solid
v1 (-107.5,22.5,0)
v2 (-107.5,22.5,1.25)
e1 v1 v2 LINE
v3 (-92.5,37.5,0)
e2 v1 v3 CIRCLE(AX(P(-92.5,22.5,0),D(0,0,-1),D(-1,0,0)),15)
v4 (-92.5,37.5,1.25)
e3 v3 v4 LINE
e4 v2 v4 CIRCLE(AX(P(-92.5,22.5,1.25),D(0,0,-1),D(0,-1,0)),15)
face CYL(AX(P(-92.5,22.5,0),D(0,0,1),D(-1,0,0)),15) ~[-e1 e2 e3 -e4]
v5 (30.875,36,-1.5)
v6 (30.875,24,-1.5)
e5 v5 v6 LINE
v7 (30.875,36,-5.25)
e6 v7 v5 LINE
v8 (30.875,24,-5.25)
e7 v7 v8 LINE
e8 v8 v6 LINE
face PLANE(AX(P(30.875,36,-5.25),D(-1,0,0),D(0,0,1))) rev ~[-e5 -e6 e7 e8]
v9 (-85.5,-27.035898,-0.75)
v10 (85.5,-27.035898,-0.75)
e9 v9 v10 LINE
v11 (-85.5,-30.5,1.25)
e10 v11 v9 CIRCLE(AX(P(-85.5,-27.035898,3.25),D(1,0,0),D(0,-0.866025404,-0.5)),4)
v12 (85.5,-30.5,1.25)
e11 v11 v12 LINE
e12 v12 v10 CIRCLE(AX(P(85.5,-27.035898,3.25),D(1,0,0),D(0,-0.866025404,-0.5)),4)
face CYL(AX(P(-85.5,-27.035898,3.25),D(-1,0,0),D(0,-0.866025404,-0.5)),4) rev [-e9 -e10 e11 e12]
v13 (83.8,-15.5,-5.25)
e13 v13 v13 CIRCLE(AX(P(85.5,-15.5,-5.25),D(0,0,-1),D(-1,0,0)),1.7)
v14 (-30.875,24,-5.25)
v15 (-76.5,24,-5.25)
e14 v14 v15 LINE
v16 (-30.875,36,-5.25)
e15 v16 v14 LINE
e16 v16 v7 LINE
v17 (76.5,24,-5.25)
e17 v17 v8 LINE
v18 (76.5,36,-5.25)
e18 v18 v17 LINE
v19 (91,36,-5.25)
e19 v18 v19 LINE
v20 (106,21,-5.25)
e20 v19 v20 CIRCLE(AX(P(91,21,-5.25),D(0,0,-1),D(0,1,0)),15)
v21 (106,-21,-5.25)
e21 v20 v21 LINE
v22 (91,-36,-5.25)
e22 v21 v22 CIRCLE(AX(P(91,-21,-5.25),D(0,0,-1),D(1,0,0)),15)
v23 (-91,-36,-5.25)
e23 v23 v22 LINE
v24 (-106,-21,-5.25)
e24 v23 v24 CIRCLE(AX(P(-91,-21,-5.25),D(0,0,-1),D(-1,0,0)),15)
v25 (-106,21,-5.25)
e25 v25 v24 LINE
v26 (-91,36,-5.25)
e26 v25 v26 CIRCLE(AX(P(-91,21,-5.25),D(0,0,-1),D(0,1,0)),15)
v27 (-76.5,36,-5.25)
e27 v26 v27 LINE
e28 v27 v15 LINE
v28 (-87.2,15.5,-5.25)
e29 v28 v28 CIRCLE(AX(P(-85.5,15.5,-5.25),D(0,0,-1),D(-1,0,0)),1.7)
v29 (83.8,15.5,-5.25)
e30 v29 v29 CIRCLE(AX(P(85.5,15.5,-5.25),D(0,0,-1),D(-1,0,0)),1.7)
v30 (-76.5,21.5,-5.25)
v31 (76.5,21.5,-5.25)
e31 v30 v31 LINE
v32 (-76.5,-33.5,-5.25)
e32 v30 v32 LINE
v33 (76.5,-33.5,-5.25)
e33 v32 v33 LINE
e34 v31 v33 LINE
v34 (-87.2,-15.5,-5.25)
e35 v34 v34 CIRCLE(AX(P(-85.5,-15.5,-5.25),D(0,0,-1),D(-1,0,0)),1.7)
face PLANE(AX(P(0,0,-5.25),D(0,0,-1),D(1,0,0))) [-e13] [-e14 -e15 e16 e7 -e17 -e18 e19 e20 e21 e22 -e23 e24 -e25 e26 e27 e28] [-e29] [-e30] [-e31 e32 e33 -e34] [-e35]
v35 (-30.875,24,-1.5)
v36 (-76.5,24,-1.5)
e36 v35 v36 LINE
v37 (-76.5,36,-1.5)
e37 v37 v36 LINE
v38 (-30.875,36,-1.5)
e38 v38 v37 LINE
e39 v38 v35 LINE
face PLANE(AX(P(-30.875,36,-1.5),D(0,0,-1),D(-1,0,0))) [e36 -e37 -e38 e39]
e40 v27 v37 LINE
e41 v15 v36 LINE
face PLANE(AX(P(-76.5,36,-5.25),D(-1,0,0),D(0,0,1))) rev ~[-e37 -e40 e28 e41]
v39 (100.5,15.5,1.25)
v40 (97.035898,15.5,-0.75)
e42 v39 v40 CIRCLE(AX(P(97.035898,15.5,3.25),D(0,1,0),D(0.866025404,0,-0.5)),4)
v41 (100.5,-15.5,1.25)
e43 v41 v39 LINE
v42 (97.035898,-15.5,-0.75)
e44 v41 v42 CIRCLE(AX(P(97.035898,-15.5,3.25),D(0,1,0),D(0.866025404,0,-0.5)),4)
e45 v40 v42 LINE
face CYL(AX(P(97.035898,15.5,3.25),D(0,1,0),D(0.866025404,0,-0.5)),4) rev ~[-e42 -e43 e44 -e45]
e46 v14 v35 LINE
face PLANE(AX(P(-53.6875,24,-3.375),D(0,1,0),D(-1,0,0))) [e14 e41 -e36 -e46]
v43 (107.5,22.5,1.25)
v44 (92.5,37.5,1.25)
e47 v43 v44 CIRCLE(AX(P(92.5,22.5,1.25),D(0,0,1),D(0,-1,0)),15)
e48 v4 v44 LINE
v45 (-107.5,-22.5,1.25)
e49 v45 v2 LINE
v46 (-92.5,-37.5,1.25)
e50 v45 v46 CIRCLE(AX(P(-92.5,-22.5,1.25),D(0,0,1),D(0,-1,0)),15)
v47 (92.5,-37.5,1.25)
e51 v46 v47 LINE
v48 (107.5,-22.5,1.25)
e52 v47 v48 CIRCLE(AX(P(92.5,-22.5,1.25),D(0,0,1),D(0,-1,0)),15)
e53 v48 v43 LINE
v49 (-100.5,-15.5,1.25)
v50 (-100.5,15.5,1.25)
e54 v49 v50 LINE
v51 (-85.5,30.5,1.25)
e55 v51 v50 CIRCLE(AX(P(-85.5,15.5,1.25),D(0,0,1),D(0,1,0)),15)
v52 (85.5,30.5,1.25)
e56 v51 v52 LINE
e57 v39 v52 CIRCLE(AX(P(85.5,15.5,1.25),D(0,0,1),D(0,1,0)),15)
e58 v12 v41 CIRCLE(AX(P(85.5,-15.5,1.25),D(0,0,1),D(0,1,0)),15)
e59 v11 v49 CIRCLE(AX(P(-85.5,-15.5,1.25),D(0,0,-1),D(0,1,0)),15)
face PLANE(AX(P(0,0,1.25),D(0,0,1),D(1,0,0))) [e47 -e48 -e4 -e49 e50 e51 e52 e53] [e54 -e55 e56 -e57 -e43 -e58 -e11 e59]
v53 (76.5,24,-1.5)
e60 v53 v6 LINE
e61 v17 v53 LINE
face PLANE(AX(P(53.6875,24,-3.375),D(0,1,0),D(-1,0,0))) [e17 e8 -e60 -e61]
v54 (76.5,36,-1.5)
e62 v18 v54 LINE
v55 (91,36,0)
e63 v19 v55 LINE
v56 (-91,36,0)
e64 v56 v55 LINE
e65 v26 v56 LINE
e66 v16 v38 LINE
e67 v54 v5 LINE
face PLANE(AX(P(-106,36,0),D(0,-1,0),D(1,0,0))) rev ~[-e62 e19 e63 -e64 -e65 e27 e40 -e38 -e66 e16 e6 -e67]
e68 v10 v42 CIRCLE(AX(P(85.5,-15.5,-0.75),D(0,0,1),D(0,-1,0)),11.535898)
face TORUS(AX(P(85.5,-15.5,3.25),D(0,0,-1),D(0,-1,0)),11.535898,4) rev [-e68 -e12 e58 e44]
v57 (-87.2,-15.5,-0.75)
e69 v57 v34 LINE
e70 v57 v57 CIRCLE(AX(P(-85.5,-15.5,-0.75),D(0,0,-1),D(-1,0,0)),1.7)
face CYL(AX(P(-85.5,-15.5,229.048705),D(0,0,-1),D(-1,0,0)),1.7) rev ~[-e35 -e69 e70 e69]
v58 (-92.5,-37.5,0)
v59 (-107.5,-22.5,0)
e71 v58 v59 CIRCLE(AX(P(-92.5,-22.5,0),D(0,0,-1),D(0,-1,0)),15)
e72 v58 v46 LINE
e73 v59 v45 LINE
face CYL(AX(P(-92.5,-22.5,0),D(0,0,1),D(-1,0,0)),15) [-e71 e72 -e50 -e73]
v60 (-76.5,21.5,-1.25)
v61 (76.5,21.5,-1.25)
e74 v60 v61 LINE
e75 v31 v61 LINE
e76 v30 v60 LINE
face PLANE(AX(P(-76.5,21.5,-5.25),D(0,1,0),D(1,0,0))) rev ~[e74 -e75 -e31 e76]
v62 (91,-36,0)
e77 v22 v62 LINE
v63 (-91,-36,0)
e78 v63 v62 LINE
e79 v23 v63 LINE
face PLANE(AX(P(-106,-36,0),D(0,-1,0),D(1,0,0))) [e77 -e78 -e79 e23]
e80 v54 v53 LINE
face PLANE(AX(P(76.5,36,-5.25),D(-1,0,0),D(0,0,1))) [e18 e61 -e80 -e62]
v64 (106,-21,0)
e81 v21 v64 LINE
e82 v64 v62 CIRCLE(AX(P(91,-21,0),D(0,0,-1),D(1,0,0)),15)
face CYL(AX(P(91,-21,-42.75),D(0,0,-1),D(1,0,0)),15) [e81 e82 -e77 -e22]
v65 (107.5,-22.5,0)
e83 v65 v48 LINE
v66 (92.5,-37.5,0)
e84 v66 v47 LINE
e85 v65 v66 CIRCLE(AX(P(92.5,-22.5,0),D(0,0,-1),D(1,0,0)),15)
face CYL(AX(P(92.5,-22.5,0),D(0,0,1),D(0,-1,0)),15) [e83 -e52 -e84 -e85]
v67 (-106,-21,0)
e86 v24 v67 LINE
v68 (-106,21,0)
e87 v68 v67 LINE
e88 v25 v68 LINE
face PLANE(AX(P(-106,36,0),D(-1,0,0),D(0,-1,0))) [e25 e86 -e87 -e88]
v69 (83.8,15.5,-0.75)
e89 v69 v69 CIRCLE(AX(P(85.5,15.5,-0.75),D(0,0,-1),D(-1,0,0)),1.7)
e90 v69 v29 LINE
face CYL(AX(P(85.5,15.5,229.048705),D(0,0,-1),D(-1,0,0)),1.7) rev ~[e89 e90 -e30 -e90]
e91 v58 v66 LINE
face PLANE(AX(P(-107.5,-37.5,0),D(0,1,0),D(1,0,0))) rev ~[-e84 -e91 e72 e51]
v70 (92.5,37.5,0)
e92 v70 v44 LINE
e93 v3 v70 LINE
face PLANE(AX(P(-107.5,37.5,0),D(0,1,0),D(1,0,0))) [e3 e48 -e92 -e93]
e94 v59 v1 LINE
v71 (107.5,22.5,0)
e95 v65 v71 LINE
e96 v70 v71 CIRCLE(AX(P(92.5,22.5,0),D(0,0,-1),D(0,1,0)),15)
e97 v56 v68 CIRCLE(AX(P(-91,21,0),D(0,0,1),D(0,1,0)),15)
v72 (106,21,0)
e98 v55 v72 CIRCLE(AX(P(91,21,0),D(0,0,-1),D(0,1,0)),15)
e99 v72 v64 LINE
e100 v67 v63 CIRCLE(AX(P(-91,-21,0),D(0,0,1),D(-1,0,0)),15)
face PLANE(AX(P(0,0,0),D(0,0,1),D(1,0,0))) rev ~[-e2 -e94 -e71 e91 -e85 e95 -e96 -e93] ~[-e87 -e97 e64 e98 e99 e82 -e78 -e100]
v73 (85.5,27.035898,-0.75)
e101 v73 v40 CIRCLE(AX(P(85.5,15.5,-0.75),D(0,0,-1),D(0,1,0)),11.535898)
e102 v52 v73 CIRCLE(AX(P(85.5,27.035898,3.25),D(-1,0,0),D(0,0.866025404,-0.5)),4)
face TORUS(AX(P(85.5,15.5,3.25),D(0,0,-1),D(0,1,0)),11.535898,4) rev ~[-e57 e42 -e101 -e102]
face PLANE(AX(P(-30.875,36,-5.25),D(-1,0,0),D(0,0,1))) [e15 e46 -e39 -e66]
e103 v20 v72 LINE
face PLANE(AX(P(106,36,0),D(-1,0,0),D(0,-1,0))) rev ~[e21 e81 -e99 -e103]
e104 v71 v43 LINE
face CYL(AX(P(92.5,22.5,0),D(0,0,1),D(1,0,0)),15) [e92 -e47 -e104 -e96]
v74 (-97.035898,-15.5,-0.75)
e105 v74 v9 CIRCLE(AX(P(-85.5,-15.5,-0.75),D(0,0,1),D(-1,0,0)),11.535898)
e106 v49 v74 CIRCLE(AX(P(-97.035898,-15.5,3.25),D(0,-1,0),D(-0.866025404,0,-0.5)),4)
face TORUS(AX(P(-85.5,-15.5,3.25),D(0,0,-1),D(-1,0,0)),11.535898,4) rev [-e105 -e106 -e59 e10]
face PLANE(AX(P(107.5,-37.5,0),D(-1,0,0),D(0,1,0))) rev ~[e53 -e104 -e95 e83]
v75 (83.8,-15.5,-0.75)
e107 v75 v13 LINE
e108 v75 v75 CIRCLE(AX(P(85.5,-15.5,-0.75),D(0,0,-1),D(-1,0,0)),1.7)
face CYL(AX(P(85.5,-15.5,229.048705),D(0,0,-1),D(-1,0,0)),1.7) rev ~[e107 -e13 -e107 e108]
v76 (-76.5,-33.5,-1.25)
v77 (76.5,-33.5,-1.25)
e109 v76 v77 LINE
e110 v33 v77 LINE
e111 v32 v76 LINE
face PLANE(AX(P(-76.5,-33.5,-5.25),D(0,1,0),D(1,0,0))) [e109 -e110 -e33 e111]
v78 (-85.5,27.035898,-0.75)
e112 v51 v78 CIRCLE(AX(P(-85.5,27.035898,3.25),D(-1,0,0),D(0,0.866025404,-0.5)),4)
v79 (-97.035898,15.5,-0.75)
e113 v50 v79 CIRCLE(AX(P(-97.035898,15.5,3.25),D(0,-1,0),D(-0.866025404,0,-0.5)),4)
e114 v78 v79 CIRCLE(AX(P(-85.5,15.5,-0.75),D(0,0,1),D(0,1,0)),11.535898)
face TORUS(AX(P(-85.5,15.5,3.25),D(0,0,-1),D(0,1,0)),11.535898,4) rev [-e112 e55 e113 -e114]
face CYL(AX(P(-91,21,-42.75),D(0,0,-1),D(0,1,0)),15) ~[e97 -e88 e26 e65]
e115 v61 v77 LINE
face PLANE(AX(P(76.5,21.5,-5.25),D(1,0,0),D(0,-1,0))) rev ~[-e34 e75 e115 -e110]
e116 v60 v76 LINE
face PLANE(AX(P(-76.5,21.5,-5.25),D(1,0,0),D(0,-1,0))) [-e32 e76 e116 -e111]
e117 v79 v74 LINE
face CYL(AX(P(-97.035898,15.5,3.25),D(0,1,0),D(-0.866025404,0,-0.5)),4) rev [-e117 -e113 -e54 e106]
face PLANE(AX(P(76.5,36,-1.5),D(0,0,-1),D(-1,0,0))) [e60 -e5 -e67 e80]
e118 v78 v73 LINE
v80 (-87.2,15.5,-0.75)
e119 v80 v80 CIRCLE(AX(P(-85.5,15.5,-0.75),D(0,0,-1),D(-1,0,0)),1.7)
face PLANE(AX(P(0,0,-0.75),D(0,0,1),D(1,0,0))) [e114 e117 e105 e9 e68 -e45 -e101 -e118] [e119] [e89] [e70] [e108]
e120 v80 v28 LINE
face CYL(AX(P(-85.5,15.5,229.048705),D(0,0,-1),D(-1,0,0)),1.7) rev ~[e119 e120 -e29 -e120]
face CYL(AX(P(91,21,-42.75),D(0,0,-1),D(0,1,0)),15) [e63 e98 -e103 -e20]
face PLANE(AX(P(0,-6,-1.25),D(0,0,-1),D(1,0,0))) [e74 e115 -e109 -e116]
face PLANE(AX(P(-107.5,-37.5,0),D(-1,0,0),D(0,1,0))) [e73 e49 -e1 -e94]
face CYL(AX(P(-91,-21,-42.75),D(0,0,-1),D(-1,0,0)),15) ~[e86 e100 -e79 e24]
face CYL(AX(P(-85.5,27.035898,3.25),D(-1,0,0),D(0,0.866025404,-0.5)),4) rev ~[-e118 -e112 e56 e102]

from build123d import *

# Parameters (mm, degrees)
F0_W          = 215
F0_H          = 75
F1_DEPTH      = 1.25
F2_R          = 15
F3_W          = 212
F3_H          = 72
F4_DEPTH      = 5.25
F5_T1_DEPTH   = 42.75
F7_W          = 201
F7_H          = 61
F8_DEPTH      = 2
F9_R          = 15
F10_T1_DEPTH  = 31
F10_T3_DEPTH  = 171
F10_T6_ANGLE  = 90
F10_T8_ANGLE  = 90
F10_T10_ANGLE = 90
F10_T12_ANGLE = 90
F11_W         = 45.625
F11_H         = 3.75
F12_DEPTH     = 12
F13_W         = 153
F13_H         = 55
F14_DEPTH     = 4
F16_D         = 3.4


# Not quite as in the source:
# - a fillet or chamfer that OpenCascade refuses, or shapes differently, is made with other operations: its cross-section is extruded or revolved along the edge and cut away or added


with BuildPart() as f1:
    # F0 (on Top) → F1 (new body)
    with BuildSketch(Plane.XY):
        Rectangle(F0_W, F0_H)
    extrude(amount=F1_DEPTH)

    # F2
    f2_edges = [f1.edges().sort_by_distance(p)[0] for p in [
        (107.5, -37.5, 0.625),
        (107.5, 37.5, 0.625),
        (-107.5, 37.5, 0.625),
        (-107.5, -37.5, 0.625),
    ]]
    fillet(f2_edges, radius=F2_R)

    # F3 (on face) → F4 (join)
    with BuildSketch(Plane(origin=(0, 0, 0), x_dir=(1, 0, 0), z_dir=(0, 0, -1))):
        Rectangle(F3_W, F3_H)
    extrude(amount=F4_DEPTH)

    # F5: fillet of radius 15 on 4 edges, made by hand

    # F5_s2 → F5_t1 (cut)
    with BuildSketch(Plane.XY.offset(-42.75)):
        with BuildLine():
            ThreePointArc((-106, -21), (-101.6066017178, -31.6066017178), (-91, -36))
            Line((-91, -36), (-106, -36))
            Line((-106, -36), (-106, -21))
        make_face()
        with BuildLine():
            ThreePointArc((-91, 36), (-101.6066017178, 31.6066017178), (-106, 21))
            Line((-106, 21), (-106, 36))
            Line((-106, 36), (-91, 36))
        make_face()
        with BuildLine():
            ThreePointArc((91, 36), (101.6066017178, 31.6066017178), (106, 21))
            Line((106, 21), (106, 36))
            Line((106, 36), (91, 36))
        make_face()
        with BuildLine():
            ThreePointArc((106, -21), (101.6066017178, -31.6066017178), (91, -36))
            Line((91, -36), (106, -36))
            Line((106, -36), (106, -21))
        make_face()
    extrude(amount=F5_T1_DEPTH, mode=Mode.SUBTRACT)

    # F7 (on face) → F8 (cut)
    with BuildSketch(Plane.XY.offset(1.25)):
        Rectangle(F7_W, F7_H)
    extrude(amount=-F8_DEPTH, mode=Mode.SUBTRACT)

    # F9
    f9_edges = [f1.edges().sort_by_distance(p)[0] for p in [
        (-100.5, 30.5, 0.25),
        (-100.5, -30.5, 0.25),
        (100.5, 30.5, 0.25),
        (100.5, -30.5, 0.25),
    ]]
    fillet(f9_edges, radius=F9_R)

    # F10: fillet of radius 4 on 1 edges, made by hand

    # F10_s2 → F10_t1 (join)
    with BuildSketch(Plane.XZ.offset(-15.5)):
        with BuildLine():
            ThreePointArc((-100.5, 1.25), (-99.0358983849, -0.2141016151), (-97.0358983849, -0.75))
            Line((-97.0358983849, -0.75), (-100.5, -0.75))
            Line((-100.5, -0.75), (-100.5, 1.25))
        make_face()
        with BuildLine():
            ThreePointArc((100.5, 1.25), (99.0358983849, -0.2141016151), (97.0358983849, -0.75))
            Line((97.0358983849, -0.75), (100.5, -0.75))
            Line((100.5, -0.75), (100.5, 1.25))
        make_face()
    extrude(amount=F10_T1_DEPTH)

    # F10_s4 → F10_t3 (join)
    with BuildSketch(Plane.YZ.offset(-85.5)):
        with BuildLine():
            ThreePointArc((-30.5, 1.25), (-29.0358983849, -0.2141016151), (-27.0358983849, -0.75))
            Line((-27.0358983849, -0.75), (-30.5, -0.75))
            Line((-30.5, -0.75), (-30.5, 1.25))
        make_face()
        with BuildLine():
            ThreePointArc((30.5, 1.25), (29.0358983849, -0.2141016151), (27.0358983849, -0.75))
            Line((27.0358983849, -0.75), (30.5, -0.75))
            Line((30.5, -0.75), (30.5, 1.25))
        make_face()
    extrude(amount=F10_T3_DEPTH)

    # F10_s5 → F10_t6 (revolve)
    with BuildSketch(Plane.YZ.offset(-85.5)):
        with BuildLine():
            ThreePointArc((30.5, 1.25), (29.0358983849, -0.2141016151), (27.0358983849, -0.75))
            Line((27.0358983849, -0.75), (30.5, -0.75))
            Line((30.5, -0.75), (30.5, 1.25))
        make_face()
    revolve(axis=Axis((-85.5, 15.5, -0.75), (0, 0, 1)), revolution_arc=F10_T6_ANGLE)

    # F10_s7 → F10_t8 (revolve)
    with BuildSketch(Plane.XZ.offset(15.5)):
        with BuildLine():
            ThreePointArc((-100.5, 1.25), (-99.0358983849, -0.2141016151), (-97.0358983849, -0.75))
            Line((-97.0358983849, -0.75), (-100.5, -0.75))
            Line((-100.5, -0.75), (-100.5, 1.25))
        make_face()
    revolve(axis=Axis((-85.5, -15.5, -0.75), (0, 0, 1)), revolution_arc=F10_T8_ANGLE)

    # F10_s9 → F10_t10 (revolve)
    with BuildSketch(Plane.YZ.offset(85.5)):
        with BuildLine():
            ThreePointArc((-30.5, 1.25), (-29.0358983849, -0.2141016151), (-27.0358983849, -0.75))
            Line((-27.0358983849, -0.75), (-30.5, -0.75))
            Line((-30.5, -0.75), (-30.5, 1.25))
        make_face()
    revolve(axis=Axis((85.5, -15.5, -0.75), (0, 0, 1)), revolution_arc=F10_T10_ANGLE)

    # F10_s11 → F10_t12 (revolve)
    with BuildSketch(Plane.YZ.offset(85.5)):
        with BuildLine():
            ThreePointArc((30.5, 1.25), (29.0358983849, -0.2141016151), (27.0358983849, -0.75))
            Line((27.0358983849, -0.75), (30.5, -0.75))
            Line((30.5, -0.75), (30.5, 1.25))
        make_face()
    revolve(axis=Axis((85.5, 15.5, -0.75), (0, 0, -1)), revolution_arc=F10_T12_ANGLE)

    # F11 (on face) → F12 (cut)
    with BuildSketch(Plane(origin=(0, 36, 0), x_dir=(-1, 0, 0), z_dir=(0, 1, 0))):
        with Locations((-53.6875, -3.375)):
            Rectangle(F11_W, F11_H)
        with Locations((53.6875, -3.375)):
            Rectangle(F11_W, F11_H)
    extrude(amount=-F12_DEPTH, mode=Mode.SUBTRACT)

    # F13 (on face) → F14 (cut)
    with BuildSketch(Plane(origin=(0, 0, -5.25), x_dir=(1, 0, 0), z_dir=(0, 0, -1))):
        with Locations((0, 6)):
            Rectangle(F13_W, F13_H)
    extrude(amount=-F14_DEPTH, mode=Mode.SUBTRACT)

    # F16 (through all)
    with Locations(Plane.XY.offset(1.25)):
        with Locations((-85.5, 15.5), (-85.5, -15.5), (85.5, 15.5), (85.5, -15.5)):
            Hole(F16_D / 2)


solid = f1.part
